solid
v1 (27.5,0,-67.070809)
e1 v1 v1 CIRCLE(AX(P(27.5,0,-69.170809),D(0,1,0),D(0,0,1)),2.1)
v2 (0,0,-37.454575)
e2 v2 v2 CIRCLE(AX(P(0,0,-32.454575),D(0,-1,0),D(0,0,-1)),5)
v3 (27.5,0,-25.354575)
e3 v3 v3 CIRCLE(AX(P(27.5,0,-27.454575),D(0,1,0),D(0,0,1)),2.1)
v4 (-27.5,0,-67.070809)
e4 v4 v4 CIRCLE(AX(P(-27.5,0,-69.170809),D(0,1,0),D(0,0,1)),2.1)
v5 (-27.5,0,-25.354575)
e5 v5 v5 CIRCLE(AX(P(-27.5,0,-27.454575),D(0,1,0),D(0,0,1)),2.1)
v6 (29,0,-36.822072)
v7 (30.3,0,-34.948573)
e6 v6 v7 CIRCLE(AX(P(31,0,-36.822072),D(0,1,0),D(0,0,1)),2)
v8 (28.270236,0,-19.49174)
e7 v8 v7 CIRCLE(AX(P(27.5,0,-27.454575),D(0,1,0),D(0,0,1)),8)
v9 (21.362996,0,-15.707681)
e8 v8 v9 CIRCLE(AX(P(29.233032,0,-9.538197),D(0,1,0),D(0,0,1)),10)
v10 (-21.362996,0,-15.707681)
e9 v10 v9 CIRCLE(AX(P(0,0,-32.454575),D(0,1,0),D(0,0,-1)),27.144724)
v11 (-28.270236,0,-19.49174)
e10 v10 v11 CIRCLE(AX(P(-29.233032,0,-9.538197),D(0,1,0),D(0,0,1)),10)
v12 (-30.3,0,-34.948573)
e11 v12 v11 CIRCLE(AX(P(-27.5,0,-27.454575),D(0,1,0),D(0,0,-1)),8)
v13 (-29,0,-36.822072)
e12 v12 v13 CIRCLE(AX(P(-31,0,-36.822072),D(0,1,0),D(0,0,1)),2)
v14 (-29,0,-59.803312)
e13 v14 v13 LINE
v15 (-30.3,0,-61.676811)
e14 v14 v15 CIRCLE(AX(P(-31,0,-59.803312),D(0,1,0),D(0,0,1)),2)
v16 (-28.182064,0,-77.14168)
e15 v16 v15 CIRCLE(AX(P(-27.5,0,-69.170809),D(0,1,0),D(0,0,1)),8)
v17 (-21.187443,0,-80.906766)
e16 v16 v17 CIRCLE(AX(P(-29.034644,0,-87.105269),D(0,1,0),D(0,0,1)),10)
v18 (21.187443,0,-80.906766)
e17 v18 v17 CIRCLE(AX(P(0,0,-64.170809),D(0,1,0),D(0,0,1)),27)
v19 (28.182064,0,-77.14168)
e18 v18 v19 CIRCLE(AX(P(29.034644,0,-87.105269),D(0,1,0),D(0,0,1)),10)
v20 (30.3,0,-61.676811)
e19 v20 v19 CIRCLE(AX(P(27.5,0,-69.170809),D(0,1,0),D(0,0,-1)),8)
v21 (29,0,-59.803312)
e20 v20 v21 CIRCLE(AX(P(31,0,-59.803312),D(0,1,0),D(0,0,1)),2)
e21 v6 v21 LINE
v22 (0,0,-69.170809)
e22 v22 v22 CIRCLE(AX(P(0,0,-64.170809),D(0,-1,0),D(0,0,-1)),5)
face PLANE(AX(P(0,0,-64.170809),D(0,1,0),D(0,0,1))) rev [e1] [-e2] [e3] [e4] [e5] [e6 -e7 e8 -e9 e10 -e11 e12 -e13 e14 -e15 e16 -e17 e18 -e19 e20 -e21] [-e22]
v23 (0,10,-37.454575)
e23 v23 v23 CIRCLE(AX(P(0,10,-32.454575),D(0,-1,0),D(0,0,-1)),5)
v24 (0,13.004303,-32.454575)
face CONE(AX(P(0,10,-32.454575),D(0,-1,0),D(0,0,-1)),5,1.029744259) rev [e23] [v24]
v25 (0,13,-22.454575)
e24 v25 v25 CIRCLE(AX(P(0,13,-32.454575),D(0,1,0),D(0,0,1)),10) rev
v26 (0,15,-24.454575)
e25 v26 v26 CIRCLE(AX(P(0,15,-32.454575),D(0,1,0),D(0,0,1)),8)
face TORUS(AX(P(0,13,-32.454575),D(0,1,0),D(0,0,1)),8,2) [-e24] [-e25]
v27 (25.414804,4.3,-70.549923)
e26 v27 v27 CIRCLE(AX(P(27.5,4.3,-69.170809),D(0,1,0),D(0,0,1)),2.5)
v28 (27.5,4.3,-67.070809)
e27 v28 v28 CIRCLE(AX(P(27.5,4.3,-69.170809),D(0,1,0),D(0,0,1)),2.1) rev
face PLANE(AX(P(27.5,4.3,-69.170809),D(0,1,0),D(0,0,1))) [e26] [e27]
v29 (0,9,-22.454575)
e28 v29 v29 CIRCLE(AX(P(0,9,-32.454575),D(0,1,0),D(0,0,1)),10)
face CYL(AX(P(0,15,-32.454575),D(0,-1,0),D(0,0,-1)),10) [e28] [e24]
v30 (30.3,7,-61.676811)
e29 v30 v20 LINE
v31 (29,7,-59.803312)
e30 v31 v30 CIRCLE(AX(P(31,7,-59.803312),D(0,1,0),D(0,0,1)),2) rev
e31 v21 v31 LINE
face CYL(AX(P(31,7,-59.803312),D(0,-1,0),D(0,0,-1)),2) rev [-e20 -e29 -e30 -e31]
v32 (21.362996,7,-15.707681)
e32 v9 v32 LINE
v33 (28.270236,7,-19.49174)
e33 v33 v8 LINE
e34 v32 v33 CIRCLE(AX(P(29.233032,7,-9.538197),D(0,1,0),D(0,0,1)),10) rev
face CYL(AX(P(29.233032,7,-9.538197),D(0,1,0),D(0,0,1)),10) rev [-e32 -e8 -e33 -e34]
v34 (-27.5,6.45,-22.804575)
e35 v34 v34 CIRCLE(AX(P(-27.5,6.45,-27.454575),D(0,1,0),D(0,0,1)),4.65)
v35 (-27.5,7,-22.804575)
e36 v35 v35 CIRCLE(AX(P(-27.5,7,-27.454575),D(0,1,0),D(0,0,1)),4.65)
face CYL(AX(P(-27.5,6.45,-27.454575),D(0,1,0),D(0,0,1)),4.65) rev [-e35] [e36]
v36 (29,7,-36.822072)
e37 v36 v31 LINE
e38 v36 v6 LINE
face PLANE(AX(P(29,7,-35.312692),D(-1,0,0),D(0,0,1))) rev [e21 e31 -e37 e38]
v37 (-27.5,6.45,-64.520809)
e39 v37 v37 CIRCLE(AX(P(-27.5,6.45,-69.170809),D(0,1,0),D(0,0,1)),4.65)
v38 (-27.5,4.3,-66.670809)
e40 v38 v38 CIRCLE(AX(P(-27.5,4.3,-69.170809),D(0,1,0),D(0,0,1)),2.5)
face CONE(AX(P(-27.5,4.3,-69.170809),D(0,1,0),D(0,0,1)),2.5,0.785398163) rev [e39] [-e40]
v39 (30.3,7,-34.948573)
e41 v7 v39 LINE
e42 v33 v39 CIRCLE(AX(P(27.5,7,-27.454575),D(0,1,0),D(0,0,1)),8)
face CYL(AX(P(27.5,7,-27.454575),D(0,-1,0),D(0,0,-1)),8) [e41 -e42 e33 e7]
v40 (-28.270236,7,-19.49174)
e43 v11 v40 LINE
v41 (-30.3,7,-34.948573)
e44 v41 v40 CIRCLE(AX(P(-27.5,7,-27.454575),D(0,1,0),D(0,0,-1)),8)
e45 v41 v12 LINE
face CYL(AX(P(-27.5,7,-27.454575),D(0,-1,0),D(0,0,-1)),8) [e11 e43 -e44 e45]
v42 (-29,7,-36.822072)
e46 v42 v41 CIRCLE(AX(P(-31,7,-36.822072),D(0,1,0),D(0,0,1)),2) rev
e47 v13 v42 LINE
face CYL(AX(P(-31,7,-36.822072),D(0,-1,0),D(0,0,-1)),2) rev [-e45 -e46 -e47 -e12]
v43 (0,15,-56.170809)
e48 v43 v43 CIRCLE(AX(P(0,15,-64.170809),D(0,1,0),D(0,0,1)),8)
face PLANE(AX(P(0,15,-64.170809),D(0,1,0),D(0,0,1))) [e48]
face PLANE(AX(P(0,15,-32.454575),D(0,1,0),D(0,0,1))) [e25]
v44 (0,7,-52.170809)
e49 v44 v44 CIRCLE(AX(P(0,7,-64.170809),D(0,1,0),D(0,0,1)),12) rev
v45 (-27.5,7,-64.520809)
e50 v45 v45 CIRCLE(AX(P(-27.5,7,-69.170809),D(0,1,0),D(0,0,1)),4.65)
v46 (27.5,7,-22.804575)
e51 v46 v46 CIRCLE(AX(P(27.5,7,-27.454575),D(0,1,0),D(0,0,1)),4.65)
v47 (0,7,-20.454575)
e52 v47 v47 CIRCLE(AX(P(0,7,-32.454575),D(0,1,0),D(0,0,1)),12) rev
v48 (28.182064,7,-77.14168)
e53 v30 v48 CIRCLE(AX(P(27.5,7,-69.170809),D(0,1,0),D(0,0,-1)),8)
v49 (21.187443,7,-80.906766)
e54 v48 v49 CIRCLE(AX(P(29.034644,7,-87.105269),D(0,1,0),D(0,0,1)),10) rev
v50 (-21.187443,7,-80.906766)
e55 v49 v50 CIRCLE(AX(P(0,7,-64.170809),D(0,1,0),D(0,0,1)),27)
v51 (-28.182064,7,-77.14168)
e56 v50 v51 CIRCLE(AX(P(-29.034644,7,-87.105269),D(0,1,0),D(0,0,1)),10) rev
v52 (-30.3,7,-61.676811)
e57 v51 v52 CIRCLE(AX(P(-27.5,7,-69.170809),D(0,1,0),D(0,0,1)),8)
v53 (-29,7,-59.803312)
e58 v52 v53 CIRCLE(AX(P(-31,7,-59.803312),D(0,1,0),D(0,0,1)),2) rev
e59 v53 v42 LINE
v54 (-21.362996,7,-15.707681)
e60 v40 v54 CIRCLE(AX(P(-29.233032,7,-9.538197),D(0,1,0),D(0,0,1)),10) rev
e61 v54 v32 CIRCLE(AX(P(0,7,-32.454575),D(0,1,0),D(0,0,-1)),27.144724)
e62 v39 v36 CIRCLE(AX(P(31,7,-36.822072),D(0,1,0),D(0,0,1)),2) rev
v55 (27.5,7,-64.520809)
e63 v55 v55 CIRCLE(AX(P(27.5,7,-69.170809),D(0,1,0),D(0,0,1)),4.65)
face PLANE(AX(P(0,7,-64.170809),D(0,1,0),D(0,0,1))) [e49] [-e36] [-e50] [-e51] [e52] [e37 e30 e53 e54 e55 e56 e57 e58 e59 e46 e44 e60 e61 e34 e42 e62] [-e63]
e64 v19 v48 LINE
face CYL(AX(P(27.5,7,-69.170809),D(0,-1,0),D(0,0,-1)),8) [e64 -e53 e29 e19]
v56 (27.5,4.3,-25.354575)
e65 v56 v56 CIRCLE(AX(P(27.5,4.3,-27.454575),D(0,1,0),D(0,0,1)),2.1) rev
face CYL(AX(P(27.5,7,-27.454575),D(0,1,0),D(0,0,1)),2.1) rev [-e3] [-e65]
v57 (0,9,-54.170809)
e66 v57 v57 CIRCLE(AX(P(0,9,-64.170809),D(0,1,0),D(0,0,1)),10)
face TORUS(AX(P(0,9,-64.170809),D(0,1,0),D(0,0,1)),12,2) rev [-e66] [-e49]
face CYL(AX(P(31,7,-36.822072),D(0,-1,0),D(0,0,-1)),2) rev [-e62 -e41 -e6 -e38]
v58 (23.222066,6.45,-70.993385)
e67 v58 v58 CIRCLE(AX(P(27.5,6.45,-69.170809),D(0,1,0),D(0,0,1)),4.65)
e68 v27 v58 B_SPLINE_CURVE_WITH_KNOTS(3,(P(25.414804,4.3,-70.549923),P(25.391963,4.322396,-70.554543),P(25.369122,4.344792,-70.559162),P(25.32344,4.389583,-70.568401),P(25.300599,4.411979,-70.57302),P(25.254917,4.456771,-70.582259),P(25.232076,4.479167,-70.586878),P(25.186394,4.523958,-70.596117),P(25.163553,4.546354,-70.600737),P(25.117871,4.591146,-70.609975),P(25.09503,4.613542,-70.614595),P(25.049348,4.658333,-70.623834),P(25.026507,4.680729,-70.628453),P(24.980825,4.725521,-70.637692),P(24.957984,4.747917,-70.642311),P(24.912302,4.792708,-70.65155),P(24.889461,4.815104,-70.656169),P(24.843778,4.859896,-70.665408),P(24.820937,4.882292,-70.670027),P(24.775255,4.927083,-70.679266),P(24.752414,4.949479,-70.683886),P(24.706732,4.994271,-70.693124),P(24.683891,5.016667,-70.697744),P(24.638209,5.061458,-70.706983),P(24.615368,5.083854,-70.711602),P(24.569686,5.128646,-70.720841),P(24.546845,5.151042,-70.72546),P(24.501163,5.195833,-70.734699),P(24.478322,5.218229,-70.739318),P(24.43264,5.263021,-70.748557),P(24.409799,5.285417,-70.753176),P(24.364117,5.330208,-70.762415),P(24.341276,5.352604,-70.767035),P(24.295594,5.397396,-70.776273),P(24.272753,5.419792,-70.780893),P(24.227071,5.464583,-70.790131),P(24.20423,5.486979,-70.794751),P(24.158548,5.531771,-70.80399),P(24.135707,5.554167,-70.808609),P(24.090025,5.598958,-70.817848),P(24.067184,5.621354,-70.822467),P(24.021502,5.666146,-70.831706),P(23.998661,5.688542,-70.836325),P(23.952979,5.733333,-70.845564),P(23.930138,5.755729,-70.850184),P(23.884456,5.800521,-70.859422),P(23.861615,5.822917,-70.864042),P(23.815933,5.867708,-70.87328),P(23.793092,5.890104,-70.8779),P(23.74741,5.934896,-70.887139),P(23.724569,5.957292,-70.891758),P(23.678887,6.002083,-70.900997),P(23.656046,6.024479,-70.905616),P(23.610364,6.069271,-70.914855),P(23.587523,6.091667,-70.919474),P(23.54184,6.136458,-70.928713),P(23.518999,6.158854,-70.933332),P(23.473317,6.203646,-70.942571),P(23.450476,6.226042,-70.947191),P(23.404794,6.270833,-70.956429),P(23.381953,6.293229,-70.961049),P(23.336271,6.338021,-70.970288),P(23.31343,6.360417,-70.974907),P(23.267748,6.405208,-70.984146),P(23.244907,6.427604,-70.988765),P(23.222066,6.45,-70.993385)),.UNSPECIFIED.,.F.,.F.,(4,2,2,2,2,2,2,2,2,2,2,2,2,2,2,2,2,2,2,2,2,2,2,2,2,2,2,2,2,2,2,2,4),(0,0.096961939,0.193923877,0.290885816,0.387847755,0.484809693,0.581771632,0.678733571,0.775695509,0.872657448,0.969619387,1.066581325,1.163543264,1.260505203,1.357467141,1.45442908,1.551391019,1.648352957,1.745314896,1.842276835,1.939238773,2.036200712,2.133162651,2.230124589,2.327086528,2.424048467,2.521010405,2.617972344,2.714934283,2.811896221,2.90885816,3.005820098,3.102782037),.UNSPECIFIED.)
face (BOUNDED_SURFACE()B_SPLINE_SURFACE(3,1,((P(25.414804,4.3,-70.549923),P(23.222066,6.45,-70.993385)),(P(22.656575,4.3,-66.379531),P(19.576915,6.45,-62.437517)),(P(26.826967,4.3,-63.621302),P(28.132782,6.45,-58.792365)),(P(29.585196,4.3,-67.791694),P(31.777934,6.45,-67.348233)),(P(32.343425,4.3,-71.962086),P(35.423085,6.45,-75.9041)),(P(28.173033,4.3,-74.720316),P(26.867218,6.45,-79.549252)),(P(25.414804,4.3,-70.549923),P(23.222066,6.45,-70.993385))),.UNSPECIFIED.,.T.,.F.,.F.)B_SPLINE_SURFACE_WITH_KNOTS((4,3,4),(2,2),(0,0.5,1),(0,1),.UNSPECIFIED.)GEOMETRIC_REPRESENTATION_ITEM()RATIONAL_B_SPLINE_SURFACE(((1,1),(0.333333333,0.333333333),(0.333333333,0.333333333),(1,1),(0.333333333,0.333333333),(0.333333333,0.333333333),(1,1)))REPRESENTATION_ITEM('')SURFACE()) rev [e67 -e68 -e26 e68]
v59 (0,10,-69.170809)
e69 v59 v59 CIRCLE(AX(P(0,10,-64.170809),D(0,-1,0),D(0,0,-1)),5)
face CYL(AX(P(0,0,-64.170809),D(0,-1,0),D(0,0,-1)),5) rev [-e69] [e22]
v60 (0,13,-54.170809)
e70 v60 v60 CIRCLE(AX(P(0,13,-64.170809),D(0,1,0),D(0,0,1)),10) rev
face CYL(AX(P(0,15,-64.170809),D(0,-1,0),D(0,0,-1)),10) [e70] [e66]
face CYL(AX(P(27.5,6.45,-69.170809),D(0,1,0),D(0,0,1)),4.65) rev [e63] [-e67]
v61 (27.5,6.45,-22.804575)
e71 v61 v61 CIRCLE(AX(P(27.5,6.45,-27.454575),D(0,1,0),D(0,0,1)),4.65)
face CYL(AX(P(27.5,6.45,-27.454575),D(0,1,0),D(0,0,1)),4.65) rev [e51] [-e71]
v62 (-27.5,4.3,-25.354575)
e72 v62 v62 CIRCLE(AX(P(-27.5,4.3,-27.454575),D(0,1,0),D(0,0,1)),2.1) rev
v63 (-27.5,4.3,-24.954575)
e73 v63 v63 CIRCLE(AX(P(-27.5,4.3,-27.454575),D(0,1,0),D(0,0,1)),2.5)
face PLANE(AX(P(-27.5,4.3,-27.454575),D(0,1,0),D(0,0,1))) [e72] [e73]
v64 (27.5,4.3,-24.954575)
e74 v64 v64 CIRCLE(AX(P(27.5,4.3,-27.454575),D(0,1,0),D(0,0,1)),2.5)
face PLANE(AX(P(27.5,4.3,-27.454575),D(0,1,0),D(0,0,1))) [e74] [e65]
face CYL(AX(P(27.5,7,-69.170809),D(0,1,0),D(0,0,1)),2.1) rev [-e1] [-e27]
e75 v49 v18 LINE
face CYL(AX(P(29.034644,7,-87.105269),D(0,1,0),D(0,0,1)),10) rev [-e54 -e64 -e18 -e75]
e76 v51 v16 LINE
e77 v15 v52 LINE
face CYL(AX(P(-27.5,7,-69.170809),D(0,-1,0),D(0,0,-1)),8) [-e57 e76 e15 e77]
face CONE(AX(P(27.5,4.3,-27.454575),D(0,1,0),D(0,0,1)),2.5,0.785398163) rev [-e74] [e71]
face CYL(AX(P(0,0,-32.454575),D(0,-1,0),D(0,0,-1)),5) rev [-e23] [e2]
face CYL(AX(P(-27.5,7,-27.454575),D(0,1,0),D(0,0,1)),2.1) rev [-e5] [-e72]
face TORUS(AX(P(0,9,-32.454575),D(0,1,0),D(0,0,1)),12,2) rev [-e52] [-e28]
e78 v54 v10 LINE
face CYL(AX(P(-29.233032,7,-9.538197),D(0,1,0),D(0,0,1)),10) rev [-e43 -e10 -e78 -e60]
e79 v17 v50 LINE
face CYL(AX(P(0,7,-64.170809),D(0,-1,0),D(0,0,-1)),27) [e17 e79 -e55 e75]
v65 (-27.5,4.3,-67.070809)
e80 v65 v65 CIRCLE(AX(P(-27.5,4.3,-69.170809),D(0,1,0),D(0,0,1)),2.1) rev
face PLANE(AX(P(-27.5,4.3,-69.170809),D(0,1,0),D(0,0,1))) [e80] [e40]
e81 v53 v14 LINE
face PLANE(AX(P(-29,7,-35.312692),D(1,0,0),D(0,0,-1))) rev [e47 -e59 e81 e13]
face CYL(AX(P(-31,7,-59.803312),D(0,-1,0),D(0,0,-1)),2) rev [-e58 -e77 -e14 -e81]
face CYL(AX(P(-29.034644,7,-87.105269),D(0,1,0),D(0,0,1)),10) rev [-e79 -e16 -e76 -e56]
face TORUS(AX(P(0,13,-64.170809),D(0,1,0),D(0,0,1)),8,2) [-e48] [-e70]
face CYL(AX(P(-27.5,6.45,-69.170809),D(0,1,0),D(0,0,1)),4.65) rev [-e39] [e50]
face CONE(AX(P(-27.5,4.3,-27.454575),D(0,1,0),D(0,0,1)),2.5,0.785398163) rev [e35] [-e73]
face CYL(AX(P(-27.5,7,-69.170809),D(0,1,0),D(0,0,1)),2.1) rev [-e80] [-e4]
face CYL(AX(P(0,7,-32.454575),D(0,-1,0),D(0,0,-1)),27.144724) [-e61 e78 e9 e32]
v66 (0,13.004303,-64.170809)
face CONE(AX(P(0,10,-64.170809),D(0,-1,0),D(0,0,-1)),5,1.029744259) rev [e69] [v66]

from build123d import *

# Parameters (mm, degrees)
BOSS_EXTRUDE1_DEPTH       = 7
FILLET1_R                 = 2
FILLET2_R                 = 10
SKETCH2_R                 = 10
BOSS_EXTRUDE2_DEPTH       = 8
FILLET3_R                 = 2
M10_CLEARANCE_HOLE1_D     = 10
M10_CLEARANCE_HOLE1_DEPTH = 10
M10_CLEARANCE_HOLE1_TIP   = 3.004303095
M5X0_8_TAPPED_HOLE1_D     = 4.2
M5X0_8_TAPPED_HOLE1_DEPTH = 12.4
M5X0_8_TAPPED_HOLE1_TIP   = 1.2618073
SKETCH6_R                 = 4.65
CUT_EXTRUDE1_DEPTH        = 0.55
SKETCH8_R                 = 4.65
CUT_EXTRUDE2_DEPTH        = 0.55
SKETCH9_R                 = 2.5
SKETCH10_R                = 4.65
CUT_EXTRUDE3_DEPTH        = 0.55
SKETCH11_R                = 2.5
SKETCH12_R                = 4.65
CUT_EXTRUDE4_DEPTH        = 0.55
SKETCH13_R                = 2.5


with BuildPart() as part:
    # Sketch1 → Boss-Extrude1 (new body)
    with BuildSketch(Plane(origin=(0, 0, 0), x_dir=(1, 0, 0), z_dir=(0, 1, 0))):
        with BuildLine():
            Line((-29, 35.312691864), (-29, 61.312691864))
            ThreePointArc((-29, 61.312691864), (-35.104593263, 71.654789625), (-24.072111437, 76.399195782))
            ThreePointArc((-24.072111437, 76.399195782), (0, 91.170808686), (24.072111437, 76.399195782))
            ThreePointArc((24.072111437, 76.399195782), (35.104593263, 71.654789625), (29, 61.312691864))
            Line((29, 61.312691864), (29, 35.312691864))
            ThreePointArc((29, 35.312691864), (35.126764687, 25.039526301), (24.203518415, 20.16532205))
            ThreePointArc((24.203518415, 20.16532205), (0, 5.30985101), (-24.203518415, 20.16532205))
            ThreePointArc((-24.203518415, 20.16532205), (-35.126764687, 25.039526301), (-29, 35.312691864))
        make_face()
    extrude(amount=BOSS_EXTRUDE1_DEPTH)

    # Fillet1
    fillet1_edges = [part.edges().sort_by_distance(p)[0] for p in [
        (29, 3.5, -61.312691864),
        (29, 3.5, -35.312691864),
        (-29, 3.5, -35.312691864),
        (-29, 3.5, -61.312691864),
    ]]
    fillet(fillet1_edges, radius=FILLET1_R)

    # Fillet2
    fillet2_edges = [part.edges().sort_by_distance(p)[0] for p in [
        (24.072111437, 3.5, -76.399195782),
        (24.203518415, 3.5, -20.16532205),
        (-24.203518415, 3.5, -20.16532205),
        (-24.072111437, 3.5, -76.399195782),
    ]]
    fillet(fillet2_edges, radius=FILLET2_R)

    # Sketch2 → Boss-Extrude2 (add)
    with BuildSketch(Plane(origin=(0, 7, 0), x_dir=(1, 0, 0), z_dir=(0, 1, 0))):
        with Locations(Location((0, 64.170808686, 0), (0, 0, 270))):
            Circle(SKETCH2_R)
        with Locations(Location((0, 32.454575041, 0), (0, 0, 270))):
            Circle(SKETCH2_R)
    extrude(amount=BOSS_EXTRUDE2_DEPTH)

    # Fillet3
    fillet3_edges = [part.edges().sort_by_distance(p)[0] for p in [
        (0, 7, -74.170808686),
        (0, 15, -74.170808686),
        (0, 7, -42.454575041),
        (0, 15, -42.454575041),
    ]]
    fillet(fillet3_edges, radius=FILLET3_R)

    # M10 Clearance Hole1
    with Locations(Plane(origin=(0, 0, -32.454575041), x_dir=(0, 0, -1), z_dir=(0, -1, 0))):
        with Locations((0, 0), (31.716233645, 0)):
            Hole(M10_CLEARANCE_HOLE1_D / 2, depth=M10_CLEARANCE_HOLE1_DEPTH)
            with Locations((0, 0, -(M10_CLEARANCE_HOLE1_DEPTH + M10_CLEARANCE_HOLE1_TIP / 2))):  # 118° drill point
                Cone(0, M10_CLEARANCE_HOLE1_D / 2, M10_CLEARANCE_HOLE1_TIP, mode=Mode.SUBTRACT)

    # M5x0.8 Tapped Hole1
    with Locations(Plane(origin=(-27.5, 7, -69.170808686), x_dir=(0, 0, 1), z_dir=(0, 1, 0))):
        with Locations((0, 0), (0, 55), (41.716233645, 55), (41.716233645, 0)):
            Hole(M5X0_8_TAPPED_HOLE1_D / 2, depth=M5X0_8_TAPPED_HOLE1_DEPTH)
            with Locations((0, 0, -(M5X0_8_TAPPED_HOLE1_DEPTH + M5X0_8_TAPPED_HOLE1_TIP / 2))):  # 118° drill point
                Cone(0, M5X0_8_TAPPED_HOLE1_D / 2, M5X0_8_TAPPED_HOLE1_TIP, mode=Mode.SUBTRACT)

    # Sketch6 → Cut-Extrude1 (cut)
    with BuildSketch(Plane(origin=(0, 7, 0), x_dir=(1, 0, 0), z_dir=(0, 1, 0))):
        with Locations(Location((27.5, 69.170808686, 0), (0, 0, 270))):
            Circle(SKETCH6_R)
    extrude(amount=-CUT_EXTRUDE1_DEPTH, mode=Mode.SUBTRACT)

    # Cut-Loft1: read off the stored shape, not the designer's step
    # Cut-Loft1: loft between two sections, ruled curve by curve
    cut_loft1_from = [
        Edge.make_bspline([(25.414803916, 4.3, -70.549923363), (22.656574563, 4.3, -66.379531195), (26.826966731, 4.3, -63.621301842), (29.585196084, 4.3, -67.79169401), (32.343425437, 4.3, -71.962086178), (28.173033269, 4.3, -74.720315531), (25.414803916, 4.3, -70.549923363)], [0, 0, 0, 0, 0.5, 0.5, 0.5, 1, 1, 1, 1], 3, [1, 0.333333333, 0.333333333, 1, 0.333333333, 0.333333333, 1]),
    ]
    cut_loft1_to = [
        Edge.make_bspline([(23.222066223, 6.45, -70.993384502), (19.576914593, 6.45, -62.437516949), (28.132782146, 6.45, -58.792365318), (31.777933777, 6.45, -67.348232871), (35.423085407, 6.45, -75.904100424), (26.867217854, 6.45, -79.549252055), (23.222066223, 6.45, -70.993384502)], [0, 0, 0, 0, 0.5, 0.5, 0.5, 1, 1, 1, 1], 3, [1, 0.333333333, 0.333333333, 1, 0.333333333, 0.333333333, 1]),
    ]
    cut_loft1 = Solid(Shell([*[Face.make_surface_from_curves(cut_loft1_from[k], cut_loft1_to[k]) for k in range(1)], Face(Wire(cut_loft1_from)), Face(Wire(cut_loft1_to))]))
    add(cut_loft1, mode=Mode.SUBTRACT)

    # Sketch8 → Cut-Extrude2 (cut)
    with BuildSketch(Plane(origin=(0, 7, 0), x_dir=(1, 0, 0), z_dir=(0, 1, 0))):
        with Locations(Location((-27.5, 69.170808686, 0), (0, 0, 270))):
            Circle(SKETCH8_R)
    extrude(amount=-CUT_EXTRUDE2_DEPTH, mode=Mode.SUBTRACT)

    # Sketch9 → section 0 of cut_loft2
    with BuildSketch(Plane(origin=(0, 4.3, 0), x_dir=(1, 0, 0), z_dir=(0, 1, 0)), mode=Mode.PRIVATE) as cut_loft2_s0:
        with Locations((-27.5, 69.170808686)):
            Circle(SKETCH9_R)
    # loft up to a face of the part (cut_loft2)
    loft([cut_loft2_s0.sketch, Face(Wire([part.edges().sort_by_distance((-24.110295882, 6.45, -72.353952729))[0]]))], mode=Mode.SUBTRACT)

    # Sketch10 → Cut-Extrude3 (cut)
    with BuildSketch(Plane(origin=(0, 7, 0), x_dir=(1, 0, 0), z_dir=(0, 1, 0))):
        with Locations(Location((-27.5, 27.454575041, 0), (0, 0, 270))):
            Circle(SKETCH10_R)
    extrude(amount=-CUT_EXTRUDE3_DEPTH, mode=Mode.SUBTRACT)

    # Sketch11 → section 0 of cut_loft3
    with BuildSketch(Plane(origin=(0, 4.3, 0), x_dir=(1, 0, 0), z_dir=(0, 1, 0)), mode=Mode.PRIVATE) as cut_loft3_s0:
        with Locations((-27.5, 27.454575041)):
            Circle(SKETCH11_R)
    # loft up to a face of the part (cut_loft3)
    loft([cut_loft3_s0.sketch, Face(Wire([part.edges().sort_by_distance((-24.110295882, 6.45, -30.637719083))[0]]))], mode=Mode.SUBTRACT)

    # Sketch12 → Cut-Extrude4 (cut)
    with BuildSketch(Plane(origin=(0, 7, 0), x_dir=(1, 0, 0), z_dir=(0, 1, 0))):
        with Locations(Location((27.5, 27.454575041, 0), (0, 0, 270))):
            Circle(SKETCH12_R)
    extrude(amount=-CUT_EXTRUDE4_DEPTH, mode=Mode.SUBTRACT)

    # Sketch13 → section 0 of cut_loft4
    with BuildSketch(Plane(origin=(0, 4.3, 0), x_dir=(1, 0, 0), z_dir=(0, 1, 0)), mode=Mode.PRIVATE) as cut_loft4_s0:
        with Locations((27.5, 27.454575041)):
            Circle(SKETCH13_R)
    # loft up to a face of the part (cut_loft4)
    loft([cut_loft4_s0.sketch, Face(Wire([part.edges().sort_by_distance((30.889704118, 6.45, -30.637719083))[0]]))], mode=Mode.SUBTRACT)


solid = part.part
